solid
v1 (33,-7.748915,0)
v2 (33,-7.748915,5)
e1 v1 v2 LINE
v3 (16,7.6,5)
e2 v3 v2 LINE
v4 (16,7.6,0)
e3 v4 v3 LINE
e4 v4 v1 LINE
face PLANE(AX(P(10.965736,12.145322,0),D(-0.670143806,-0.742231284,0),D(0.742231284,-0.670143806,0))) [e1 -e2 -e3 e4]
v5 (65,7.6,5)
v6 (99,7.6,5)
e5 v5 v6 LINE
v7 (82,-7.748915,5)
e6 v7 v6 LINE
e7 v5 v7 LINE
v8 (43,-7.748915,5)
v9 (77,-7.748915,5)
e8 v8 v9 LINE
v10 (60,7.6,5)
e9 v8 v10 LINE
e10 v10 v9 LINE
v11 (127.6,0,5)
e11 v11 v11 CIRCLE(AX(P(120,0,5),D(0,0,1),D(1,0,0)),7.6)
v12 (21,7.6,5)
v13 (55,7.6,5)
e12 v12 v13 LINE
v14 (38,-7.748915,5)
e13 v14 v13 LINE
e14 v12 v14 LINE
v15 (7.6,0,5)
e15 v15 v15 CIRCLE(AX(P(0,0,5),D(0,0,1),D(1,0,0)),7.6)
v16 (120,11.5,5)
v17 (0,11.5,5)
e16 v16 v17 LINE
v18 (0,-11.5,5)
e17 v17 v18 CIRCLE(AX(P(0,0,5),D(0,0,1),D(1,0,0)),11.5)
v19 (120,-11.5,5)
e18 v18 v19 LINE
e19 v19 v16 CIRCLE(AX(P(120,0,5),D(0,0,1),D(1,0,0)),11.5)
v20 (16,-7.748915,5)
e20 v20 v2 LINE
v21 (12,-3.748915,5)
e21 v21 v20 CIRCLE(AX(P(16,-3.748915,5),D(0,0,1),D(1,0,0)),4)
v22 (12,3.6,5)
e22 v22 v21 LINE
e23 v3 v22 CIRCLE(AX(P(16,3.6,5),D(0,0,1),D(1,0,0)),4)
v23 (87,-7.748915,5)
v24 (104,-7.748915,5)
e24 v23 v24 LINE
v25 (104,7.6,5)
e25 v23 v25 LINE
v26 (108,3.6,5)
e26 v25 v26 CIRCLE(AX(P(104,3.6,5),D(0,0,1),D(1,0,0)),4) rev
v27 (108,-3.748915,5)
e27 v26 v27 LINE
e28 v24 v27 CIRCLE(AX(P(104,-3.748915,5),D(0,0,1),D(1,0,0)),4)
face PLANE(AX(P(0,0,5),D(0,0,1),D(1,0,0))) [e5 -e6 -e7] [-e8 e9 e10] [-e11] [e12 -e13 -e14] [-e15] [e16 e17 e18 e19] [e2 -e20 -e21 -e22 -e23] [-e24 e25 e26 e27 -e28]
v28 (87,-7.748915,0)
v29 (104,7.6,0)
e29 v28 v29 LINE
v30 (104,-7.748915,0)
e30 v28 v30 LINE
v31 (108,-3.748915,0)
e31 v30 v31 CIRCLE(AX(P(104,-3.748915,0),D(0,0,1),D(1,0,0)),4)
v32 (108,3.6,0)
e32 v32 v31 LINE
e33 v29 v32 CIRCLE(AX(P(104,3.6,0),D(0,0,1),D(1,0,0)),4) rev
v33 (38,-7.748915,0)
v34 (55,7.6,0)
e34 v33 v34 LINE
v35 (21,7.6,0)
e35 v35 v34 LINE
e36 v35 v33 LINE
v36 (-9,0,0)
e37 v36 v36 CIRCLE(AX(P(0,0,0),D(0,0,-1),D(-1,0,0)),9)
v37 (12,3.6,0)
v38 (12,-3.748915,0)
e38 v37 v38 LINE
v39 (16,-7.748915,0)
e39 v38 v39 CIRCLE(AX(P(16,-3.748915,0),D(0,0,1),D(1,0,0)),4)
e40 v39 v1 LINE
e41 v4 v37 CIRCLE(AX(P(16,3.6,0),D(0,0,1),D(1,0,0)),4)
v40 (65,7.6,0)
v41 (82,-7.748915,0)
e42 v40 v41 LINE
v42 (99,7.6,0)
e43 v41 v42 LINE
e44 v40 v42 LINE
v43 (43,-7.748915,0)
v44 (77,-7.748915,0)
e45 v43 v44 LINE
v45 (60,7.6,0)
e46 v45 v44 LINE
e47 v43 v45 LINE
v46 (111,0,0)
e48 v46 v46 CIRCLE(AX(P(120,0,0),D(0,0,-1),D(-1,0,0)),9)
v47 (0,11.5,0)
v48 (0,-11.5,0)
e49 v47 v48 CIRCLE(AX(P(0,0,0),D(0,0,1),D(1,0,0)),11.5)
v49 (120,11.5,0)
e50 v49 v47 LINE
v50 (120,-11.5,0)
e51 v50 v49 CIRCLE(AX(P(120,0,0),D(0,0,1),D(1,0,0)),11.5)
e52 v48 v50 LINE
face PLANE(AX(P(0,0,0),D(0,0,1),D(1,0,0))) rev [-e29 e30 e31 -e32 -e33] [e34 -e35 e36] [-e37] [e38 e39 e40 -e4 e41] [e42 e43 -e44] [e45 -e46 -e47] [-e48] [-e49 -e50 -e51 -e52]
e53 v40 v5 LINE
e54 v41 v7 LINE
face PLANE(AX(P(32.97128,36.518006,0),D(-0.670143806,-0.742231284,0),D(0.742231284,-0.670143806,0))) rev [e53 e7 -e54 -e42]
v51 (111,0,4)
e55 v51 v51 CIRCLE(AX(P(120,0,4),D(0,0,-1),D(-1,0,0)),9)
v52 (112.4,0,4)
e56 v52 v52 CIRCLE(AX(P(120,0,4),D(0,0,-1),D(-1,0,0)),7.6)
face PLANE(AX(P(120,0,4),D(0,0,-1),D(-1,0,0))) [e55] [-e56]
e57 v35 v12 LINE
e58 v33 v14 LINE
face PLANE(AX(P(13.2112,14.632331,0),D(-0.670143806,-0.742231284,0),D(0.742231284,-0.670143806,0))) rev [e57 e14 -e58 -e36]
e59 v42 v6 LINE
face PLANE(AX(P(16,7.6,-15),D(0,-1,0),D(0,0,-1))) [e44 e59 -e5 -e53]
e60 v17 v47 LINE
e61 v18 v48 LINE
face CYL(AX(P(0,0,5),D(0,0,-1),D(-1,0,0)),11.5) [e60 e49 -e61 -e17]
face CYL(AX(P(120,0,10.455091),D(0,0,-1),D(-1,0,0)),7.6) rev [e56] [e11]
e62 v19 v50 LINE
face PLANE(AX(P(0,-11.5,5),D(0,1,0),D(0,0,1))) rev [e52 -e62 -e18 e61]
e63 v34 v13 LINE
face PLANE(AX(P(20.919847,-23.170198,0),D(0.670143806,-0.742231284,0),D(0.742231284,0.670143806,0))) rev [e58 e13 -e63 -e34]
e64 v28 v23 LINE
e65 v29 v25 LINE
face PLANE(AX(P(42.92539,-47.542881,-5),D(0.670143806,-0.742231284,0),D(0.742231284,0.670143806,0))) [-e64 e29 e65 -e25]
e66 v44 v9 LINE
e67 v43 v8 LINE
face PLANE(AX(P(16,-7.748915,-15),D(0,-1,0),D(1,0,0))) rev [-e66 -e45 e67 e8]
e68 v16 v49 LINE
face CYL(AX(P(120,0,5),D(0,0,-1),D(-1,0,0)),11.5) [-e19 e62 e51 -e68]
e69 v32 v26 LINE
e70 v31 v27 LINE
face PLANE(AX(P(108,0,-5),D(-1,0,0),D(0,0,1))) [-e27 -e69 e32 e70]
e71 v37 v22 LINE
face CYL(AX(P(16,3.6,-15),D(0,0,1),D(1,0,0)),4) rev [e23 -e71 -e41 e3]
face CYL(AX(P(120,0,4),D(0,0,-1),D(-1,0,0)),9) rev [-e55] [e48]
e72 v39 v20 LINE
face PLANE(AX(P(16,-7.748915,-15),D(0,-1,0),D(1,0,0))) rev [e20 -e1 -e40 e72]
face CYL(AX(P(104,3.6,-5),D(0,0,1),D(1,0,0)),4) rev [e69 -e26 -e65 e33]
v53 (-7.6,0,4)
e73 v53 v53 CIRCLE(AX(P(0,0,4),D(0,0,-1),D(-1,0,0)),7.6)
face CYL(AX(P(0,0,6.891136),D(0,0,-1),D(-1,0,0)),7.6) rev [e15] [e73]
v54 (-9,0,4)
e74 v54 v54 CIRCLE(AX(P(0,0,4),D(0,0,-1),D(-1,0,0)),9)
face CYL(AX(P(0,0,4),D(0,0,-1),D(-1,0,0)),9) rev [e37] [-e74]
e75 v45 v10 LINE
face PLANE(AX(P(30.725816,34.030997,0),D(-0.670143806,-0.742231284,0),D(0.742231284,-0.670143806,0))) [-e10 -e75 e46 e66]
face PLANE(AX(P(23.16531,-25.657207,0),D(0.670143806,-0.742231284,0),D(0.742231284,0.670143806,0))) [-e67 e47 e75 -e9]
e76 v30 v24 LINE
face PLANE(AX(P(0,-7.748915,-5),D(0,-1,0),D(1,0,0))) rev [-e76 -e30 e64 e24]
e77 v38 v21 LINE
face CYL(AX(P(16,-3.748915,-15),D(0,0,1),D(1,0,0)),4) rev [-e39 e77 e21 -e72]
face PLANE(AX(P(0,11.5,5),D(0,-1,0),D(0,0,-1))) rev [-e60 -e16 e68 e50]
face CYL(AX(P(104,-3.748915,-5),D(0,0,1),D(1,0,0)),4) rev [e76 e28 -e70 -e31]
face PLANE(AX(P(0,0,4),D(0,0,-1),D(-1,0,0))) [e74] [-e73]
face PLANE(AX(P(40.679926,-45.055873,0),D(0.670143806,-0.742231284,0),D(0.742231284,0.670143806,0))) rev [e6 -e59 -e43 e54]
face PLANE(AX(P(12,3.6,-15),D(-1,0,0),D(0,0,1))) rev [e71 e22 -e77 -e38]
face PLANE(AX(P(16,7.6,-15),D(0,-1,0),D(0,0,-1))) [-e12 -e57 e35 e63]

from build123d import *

# Parameters (mm, degrees)
BOSS_EXTRUDE3_DEPTH     = 5
SKETCH6_R               = 9
CUT_EXTRUDE3_DEPTH      = 4
BOSS_EXTRUDE4_START     = -1
BOSS_EXTRUDE4_OUTLINE_R = 7.6
BOSS_EXTRUDE4_DEPTH     = 1
BOSS_EXTRUDE5_START     = -4
BOSS_EXTRUDE5_OUTLINE_R = 9
BOSS_EXTRUDE5_DEPTH     = 4
BOSS_EXTRUDE6_START     = -1
BOSS_EXTRUDE6_OUTLINE_R = 7.6
BOSS_EXTRUDE6_DEPTH     = 1
CUT_EXTRUDE8_DEPTH      = 20
BOSS_EXTRUDE8_DEPTH     = 5
BOSS_EXTRUDE9_DEPTH     = 5
CUT_EXTRUDE10_DEPTH     = 10


# Read off the part's stored shape, not the designer's step: Boss-Extrude4, Boss-Extrude5, Boss-Extrude6
with BuildPart() as part:
    # Sketch5 → Boss-Extrude3 (new body)
    with BuildSketch(Plane.XY):
        with BuildLine():
            Line((0, 11.5), (120, 11.5))
            ThreePointArc((120, 11.5), (131.5, 0), (120, -11.5))
            Line((120, -11.5), (0, -11.5))
            ThreePointArc((0, -11.5), (-11.5, 0), (0, 11.5))
        make_face()
    extrude(amount=BOSS_EXTRUDE3_DEPTH)

    # Sketch6 → Cut-Extrude3 (cut)
    with BuildSketch(Plane(origin=(0, 0, 0), x_dir=(-1, 0, 0), z_dir=(0, 0, -1))):
        Circle(SKETCH6_R)
    extrude(amount=-CUT_EXTRUDE3_DEPTH, mode=Mode.SUBTRACT)

    # Boss-Extrude4 outline → Boss-Extrude4 (cut)
    with BuildSketch(Plane(origin=(0, 0, 4), x_dir=(-1, 0, 0), z_dir=(0, 0, -1)).offset(BOSS_EXTRUDE4_START)):
        Circle(BOSS_EXTRUDE4_OUTLINE_R)
    extrude(amount=BOSS_EXTRUDE4_DEPTH, mode=Mode.SUBTRACT)

    # Boss-Extrude5 outline → Boss-Extrude5 (cut)
    with BuildSketch(Plane(origin=(0, 0, 0), x_dir=(-1, 0, 0), z_dir=(0, 0, -1)).offset(BOSS_EXTRUDE5_START)):
        with Locations((-120, 0)):
            Circle(BOSS_EXTRUDE5_OUTLINE_R)
    extrude(amount=BOSS_EXTRUDE5_DEPTH, mode=Mode.SUBTRACT)

    # Boss-Extrude6 outline → Boss-Extrude6 (cut)
    with BuildSketch(Plane(origin=(0, 0, 4), x_dir=(-1, 0, 0), z_dir=(0, 0, -1)).offset(BOSS_EXTRUDE6_START)):
        with Locations((-120, 0)):
            Circle(BOSS_EXTRUDE6_OUTLINE_R)
    extrude(amount=BOSS_EXTRUDE6_DEPTH, mode=Mode.SUBTRACT)

    # Sketch12 → Cut-Extrude8 (cut)
    with BuildSketch(Plane.XY.offset(5)):
        with BuildLine():
            Line((16, 7.6), (104, 7.6))
            ThreePointArc((104, 7.6), (106.828427125, 6.428427125), (108, 3.6))
            Line((108, 3.6), (108, -3.748914736))
            ThreePointArc((108, -3.748914736), (106.828427125, -6.577341861), (104, -7.748914736))
            Line((104, -7.748914736), (16, -7.748914736))
            ThreePointArc((16, -7.748914736), (13.171572875, -6.577341861), (12, -3.748914736))
            Line((12, -3.748914736), (12, 3.6))
            ThreePointArc((12, 3.6), (13.171572875, 6.428427125), (16, 7.6))
        make_face()
    extrude(amount=-CUT_EXTRUDE8_DEPTH, mode=Mode.SUBTRACT)

    # Sketch12<10> → Boss-Extrude8 (add)
    with BuildSketch(Plane.XY.offset(5)):
        Polygon((38, -7.748914736), (21, 7.6), (16, 7.6), (33, -7.748914736), align=None)
        Polygon((60, 7.6), (55, 7.6), (38, -7.748914736), (43, -7.748914736), align=None)
        Polygon((65, 7.6), (60, 7.6), (77, -7.748914736), (82, -7.748914736), align=None)
        Polygon((104, 7.6), (99, 7.6), (82, -7.748914736), (87, -7.748914736), align=None)
    extrude(amount=-BOSS_EXTRUDE8_DEPTH)

    # Sketch12<11> → Boss-Extrude9 (add)
    with BuildSketch(Plane.XY.offset(5)):
        with BuildLine():
            ThreePointArc((108, 3.6), (106.828427125, 6.428427125), (104, 7.6))
            Line((104, 7.6), (87, -7.748914736))
            Line((87, -7.748914736), (104, -7.748914736))
            ThreePointArc((104, -7.748914736), (106.828427125, -6.577341861), (108, -3.748914736))
            Line((108, -3.748914736), (108, 3.6))
        make_face()
    extrude(amount=-BOSS_EXTRUDE9_DEPTH)

    # Sketch12<14> → Cut-Extrude10 (cut)
    with BuildSketch(Plane.XY.offset(5)):
        with BuildLine():
            ThreePointArc((108, 3.6), (106.828427125, 6.428427125), (104, 7.6))
            Line((104, 7.6), (87, -7.748914736))
            Line((87, -7.748914736), (104, -7.748914736))
            ThreePointArc((104, -7.748914736), (106.828427125, -6.577341861), (108, -3.748914736))
            Line((108, -3.748914736), (108, 3.6))
        make_face()
    extrude(amount=-CUT_EXTRUDE10_DEPTH, mode=Mode.SUBTRACT)


solid = part.part
